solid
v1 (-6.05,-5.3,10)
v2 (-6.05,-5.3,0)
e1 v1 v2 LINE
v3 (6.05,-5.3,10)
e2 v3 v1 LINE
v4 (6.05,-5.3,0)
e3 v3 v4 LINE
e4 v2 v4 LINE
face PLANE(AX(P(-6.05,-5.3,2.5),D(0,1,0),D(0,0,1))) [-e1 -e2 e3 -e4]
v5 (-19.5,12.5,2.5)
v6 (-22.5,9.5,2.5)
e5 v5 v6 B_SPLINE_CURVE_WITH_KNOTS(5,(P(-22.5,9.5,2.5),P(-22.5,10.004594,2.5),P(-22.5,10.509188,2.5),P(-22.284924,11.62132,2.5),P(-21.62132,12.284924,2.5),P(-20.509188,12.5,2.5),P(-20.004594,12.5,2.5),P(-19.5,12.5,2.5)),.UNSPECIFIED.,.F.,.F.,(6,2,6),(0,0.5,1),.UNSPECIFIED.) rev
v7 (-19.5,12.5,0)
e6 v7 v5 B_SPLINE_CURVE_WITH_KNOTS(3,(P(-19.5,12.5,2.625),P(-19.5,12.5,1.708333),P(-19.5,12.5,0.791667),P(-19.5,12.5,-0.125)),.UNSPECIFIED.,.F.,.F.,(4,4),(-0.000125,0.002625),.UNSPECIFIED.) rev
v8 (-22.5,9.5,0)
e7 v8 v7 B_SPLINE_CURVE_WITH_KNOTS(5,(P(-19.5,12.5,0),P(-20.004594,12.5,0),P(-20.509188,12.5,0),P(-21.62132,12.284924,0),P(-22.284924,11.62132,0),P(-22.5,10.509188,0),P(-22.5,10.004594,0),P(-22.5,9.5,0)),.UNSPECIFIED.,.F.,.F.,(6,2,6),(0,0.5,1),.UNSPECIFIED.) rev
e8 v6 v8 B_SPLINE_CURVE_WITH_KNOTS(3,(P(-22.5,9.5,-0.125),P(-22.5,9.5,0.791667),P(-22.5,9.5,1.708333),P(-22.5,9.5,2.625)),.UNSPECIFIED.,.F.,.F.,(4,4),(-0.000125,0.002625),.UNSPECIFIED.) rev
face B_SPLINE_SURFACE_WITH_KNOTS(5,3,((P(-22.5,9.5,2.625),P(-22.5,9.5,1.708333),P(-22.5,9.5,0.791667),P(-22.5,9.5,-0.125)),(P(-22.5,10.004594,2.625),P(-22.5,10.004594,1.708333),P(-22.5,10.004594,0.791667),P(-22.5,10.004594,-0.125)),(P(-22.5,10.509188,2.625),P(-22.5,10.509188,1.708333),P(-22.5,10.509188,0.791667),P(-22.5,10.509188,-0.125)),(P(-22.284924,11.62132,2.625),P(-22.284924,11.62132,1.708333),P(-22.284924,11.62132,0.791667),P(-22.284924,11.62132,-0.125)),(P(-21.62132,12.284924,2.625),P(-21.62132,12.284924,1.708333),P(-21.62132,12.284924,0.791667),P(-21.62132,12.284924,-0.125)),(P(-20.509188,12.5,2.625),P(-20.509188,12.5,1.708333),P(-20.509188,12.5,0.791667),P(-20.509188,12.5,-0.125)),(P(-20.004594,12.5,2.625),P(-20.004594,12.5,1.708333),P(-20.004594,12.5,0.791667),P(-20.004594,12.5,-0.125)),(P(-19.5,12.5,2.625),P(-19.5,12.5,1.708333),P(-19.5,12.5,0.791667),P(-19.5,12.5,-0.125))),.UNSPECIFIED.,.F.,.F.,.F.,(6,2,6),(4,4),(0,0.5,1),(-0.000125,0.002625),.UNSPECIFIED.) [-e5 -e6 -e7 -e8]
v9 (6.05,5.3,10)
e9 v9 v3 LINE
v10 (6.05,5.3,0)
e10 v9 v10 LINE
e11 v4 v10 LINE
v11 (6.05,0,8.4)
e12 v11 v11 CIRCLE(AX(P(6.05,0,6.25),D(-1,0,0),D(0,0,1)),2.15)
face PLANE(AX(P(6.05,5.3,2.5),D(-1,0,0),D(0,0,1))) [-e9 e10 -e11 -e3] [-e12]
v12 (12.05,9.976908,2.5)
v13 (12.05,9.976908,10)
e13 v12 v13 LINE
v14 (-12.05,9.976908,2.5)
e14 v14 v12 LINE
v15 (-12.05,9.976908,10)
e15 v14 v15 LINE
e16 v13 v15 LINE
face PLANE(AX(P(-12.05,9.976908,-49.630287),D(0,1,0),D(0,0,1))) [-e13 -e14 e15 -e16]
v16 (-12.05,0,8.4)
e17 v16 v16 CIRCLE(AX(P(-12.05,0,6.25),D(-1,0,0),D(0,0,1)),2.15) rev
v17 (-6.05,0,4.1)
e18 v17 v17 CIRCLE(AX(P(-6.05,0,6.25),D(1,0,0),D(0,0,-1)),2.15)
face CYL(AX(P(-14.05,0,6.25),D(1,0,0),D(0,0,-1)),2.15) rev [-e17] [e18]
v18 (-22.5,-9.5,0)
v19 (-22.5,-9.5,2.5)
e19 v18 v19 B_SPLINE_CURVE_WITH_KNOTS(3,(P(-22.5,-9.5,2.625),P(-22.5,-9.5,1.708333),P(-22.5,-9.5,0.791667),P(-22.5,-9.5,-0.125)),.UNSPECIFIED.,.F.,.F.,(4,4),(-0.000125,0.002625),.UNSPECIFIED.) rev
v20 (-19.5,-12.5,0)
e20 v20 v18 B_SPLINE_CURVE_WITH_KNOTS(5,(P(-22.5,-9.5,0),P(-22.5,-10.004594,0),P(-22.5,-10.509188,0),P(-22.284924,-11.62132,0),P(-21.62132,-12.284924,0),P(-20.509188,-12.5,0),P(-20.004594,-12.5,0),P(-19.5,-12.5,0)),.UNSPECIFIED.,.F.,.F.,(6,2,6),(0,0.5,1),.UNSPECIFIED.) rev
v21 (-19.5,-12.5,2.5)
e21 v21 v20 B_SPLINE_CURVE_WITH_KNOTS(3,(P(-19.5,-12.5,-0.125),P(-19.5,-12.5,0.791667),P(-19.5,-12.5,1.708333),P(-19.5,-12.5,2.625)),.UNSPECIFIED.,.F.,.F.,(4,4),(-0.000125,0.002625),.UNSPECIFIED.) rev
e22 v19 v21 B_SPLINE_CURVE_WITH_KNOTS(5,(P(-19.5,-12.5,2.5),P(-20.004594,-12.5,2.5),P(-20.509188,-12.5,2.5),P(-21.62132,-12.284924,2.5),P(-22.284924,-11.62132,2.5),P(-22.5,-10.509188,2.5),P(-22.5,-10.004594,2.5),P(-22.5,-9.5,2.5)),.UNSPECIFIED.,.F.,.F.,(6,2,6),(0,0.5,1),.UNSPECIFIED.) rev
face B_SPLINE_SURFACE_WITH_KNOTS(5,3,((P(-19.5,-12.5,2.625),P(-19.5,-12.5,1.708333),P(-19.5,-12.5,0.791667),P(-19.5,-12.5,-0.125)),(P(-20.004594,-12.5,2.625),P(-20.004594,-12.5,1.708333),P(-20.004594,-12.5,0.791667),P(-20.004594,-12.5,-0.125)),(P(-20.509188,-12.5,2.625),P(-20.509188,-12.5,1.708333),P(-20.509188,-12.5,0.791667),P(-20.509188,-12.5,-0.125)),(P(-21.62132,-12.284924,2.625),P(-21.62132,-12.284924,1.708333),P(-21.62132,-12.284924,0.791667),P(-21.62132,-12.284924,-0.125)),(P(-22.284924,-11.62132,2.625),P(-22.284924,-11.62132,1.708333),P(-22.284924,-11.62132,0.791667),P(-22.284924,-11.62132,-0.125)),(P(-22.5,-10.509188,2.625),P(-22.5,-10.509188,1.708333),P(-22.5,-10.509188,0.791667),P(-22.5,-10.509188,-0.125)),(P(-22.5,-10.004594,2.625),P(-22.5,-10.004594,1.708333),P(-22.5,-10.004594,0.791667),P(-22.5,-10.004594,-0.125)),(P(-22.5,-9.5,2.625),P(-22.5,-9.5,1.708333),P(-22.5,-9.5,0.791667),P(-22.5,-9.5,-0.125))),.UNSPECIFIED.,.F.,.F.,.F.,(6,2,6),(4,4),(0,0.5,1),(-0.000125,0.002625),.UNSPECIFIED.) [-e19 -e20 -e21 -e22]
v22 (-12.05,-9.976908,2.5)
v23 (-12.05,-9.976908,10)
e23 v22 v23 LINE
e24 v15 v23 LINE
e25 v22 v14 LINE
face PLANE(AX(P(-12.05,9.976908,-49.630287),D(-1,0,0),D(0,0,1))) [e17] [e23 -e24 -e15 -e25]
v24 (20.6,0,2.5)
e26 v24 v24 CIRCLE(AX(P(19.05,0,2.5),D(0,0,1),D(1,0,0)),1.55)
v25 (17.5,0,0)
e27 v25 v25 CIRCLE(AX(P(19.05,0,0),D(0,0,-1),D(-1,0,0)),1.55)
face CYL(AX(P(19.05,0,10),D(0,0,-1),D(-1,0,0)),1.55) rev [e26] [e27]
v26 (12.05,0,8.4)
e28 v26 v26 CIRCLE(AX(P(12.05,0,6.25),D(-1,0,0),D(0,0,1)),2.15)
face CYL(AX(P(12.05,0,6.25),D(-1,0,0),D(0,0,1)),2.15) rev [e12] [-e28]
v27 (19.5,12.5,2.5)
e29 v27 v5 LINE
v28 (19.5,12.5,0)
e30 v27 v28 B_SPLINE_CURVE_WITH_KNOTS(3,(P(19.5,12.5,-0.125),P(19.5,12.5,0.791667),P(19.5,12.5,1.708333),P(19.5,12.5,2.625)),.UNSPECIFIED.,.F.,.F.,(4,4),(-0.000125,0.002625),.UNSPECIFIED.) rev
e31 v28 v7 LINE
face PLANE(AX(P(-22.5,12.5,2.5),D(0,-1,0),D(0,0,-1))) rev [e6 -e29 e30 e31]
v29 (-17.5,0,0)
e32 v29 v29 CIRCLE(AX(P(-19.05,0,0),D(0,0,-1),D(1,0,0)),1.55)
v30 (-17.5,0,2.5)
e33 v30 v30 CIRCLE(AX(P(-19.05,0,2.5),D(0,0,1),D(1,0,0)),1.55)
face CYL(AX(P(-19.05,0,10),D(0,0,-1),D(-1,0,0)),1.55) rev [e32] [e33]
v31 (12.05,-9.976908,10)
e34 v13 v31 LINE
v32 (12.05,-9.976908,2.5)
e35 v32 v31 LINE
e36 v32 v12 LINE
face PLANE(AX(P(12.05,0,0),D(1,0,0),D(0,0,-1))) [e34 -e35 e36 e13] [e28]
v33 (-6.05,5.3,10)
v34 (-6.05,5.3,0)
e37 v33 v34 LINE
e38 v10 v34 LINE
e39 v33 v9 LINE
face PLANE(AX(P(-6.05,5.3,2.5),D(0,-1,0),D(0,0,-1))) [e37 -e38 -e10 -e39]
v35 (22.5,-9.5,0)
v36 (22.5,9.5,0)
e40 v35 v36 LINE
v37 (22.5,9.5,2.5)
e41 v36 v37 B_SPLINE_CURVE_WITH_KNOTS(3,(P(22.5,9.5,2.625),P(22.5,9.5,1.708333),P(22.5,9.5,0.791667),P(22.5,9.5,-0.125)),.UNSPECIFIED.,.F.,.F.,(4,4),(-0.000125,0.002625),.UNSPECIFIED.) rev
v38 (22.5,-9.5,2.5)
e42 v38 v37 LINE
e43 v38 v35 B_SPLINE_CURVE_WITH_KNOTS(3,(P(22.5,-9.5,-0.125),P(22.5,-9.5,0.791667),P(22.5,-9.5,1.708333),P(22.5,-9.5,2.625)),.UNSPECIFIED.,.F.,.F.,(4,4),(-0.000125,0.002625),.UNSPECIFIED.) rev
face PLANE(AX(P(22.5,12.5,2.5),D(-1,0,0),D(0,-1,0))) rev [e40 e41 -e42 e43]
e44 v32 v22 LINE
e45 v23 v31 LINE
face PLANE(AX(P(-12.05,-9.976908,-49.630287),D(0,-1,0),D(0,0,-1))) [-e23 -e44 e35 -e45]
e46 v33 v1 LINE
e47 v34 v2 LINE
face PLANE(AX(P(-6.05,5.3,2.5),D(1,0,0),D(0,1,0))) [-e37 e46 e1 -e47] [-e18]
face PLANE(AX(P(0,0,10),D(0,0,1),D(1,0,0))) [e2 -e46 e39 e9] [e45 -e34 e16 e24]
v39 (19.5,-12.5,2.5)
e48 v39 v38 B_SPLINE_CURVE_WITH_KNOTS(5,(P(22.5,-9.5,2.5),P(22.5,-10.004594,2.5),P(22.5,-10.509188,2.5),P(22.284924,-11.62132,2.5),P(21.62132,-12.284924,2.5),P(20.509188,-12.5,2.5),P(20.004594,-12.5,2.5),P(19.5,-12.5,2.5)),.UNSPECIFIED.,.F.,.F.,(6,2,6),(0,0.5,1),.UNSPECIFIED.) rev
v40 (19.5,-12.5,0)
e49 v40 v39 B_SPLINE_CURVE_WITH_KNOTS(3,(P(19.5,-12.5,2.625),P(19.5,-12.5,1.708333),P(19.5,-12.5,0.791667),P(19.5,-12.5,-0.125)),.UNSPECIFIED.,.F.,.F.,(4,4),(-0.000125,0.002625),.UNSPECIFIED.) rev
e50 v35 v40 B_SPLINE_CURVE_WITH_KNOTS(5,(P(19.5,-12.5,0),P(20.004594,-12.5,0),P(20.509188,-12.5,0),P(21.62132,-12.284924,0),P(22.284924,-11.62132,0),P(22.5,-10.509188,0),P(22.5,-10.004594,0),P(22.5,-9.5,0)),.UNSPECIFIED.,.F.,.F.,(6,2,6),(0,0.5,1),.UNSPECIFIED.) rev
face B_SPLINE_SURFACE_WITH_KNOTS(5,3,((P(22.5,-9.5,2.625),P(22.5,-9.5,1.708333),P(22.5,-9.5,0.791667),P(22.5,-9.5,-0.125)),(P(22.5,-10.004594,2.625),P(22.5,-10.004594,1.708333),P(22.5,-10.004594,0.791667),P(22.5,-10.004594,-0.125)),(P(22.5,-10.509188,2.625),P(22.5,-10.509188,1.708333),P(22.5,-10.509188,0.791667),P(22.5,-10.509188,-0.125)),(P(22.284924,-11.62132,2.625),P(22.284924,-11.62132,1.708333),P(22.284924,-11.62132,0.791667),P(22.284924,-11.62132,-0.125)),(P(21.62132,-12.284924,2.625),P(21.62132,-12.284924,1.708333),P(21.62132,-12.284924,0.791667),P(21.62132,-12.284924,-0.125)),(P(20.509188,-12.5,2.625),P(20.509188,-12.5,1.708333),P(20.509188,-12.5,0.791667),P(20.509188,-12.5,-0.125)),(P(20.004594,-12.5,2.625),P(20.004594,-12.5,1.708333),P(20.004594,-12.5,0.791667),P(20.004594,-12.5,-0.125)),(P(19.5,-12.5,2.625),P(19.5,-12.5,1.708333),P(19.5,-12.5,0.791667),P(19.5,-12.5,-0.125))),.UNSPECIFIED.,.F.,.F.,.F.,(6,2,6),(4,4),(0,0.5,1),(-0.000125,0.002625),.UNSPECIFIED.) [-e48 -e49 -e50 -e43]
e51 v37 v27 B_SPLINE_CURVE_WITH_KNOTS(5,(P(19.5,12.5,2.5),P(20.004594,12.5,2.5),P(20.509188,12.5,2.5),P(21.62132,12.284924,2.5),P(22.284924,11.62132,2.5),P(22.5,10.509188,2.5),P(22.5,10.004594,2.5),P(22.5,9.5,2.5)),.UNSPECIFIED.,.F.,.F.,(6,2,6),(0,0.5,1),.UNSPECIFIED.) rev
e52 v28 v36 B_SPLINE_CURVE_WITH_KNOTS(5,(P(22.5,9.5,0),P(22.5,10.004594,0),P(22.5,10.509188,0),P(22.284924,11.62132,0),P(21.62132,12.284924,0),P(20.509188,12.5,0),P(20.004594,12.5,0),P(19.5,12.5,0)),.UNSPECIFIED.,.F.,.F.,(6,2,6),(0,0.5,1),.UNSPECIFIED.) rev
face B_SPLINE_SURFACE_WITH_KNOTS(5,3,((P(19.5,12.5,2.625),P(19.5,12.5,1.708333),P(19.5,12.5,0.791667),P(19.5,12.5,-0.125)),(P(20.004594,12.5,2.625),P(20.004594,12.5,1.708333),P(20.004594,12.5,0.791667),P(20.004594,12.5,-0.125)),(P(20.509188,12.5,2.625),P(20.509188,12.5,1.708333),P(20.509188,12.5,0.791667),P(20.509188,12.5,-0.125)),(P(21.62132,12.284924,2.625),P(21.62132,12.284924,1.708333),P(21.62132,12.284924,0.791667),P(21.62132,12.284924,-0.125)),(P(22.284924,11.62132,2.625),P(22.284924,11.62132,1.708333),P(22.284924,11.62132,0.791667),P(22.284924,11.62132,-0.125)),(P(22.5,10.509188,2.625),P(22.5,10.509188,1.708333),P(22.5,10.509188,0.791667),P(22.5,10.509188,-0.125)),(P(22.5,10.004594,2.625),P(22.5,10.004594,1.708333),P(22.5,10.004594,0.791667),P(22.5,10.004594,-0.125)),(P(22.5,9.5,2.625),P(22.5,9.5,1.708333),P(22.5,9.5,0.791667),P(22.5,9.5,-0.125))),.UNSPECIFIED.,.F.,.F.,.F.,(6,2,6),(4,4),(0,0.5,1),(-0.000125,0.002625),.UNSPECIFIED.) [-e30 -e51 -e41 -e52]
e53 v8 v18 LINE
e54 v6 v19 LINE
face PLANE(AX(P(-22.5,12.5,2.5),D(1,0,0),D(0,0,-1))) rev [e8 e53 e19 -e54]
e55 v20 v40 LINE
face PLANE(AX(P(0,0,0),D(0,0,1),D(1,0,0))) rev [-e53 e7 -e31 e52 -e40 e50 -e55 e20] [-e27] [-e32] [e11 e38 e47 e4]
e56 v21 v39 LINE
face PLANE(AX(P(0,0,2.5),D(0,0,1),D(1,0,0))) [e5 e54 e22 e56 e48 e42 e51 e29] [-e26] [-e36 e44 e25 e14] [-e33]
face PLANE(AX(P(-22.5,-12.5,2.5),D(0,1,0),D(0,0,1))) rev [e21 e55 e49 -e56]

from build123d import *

# Parameters (mm, degrees)
SKETCH1_W           = 45
SKETCH1_H           = 25
SKETCH1_W_2         = 12.1
SKETCH1_H_2         = 10.6
BOSS_EXTRUDE1_DEPTH = 2.5
SKETCH2_W           = 12.1
SKETCH2_H           = 7.2
BOSS_EXTRUDE2_DEPTH = 7.5
BOSS_EXTRUDE3_START = 6.05
SKETCH3_W           = 7.5
SKETCH3_H           = 25
SKETCH3_R           = 2.15
BOSS_EXTRUDE3_DEPTH = 6
BOSS_EXTRUDE4_START = -14.05
SKETCH3_2_W         = 7.5
SKETCH3_2_H         = 25
SKETCH3_2_R         = 2.15
BOSS_EXTRUDE4_DEPTH = 8
SKETCH5_R           = 1.55
CUT_EXTRUDE1_DEPTH  = 10
FILLET1_SIZE        = 3
SKETCH6_OUTSIDE_W   = 57.488
SKETCH6_OUTSIDE_H   = 37.488
SKETCH6_OUTSIDE_W_2 = 24.1
SKETCH6_OUTSIDE_H_2 = 19.953815678
CUT_EXTRUDE2_DEPTH  = 7.5


with BuildPart() as part:
    # Sketch1 → Boss-Extrude1 (new body)
    with BuildSketch(Plane.XY):
        Rectangle(SKETCH1_W, SKETCH1_H)
        Rectangle(SKETCH1_W_2, SKETCH1_H_2, mode=Mode.SUBTRACT)
    extrude(amount=BOSS_EXTRUDE1_DEPTH)

    # Sketch2 → Boss-Extrude2 (add)
    with BuildSketch(Plane.XY.offset(2.5)):
        with Locations((0, -8.9)):
            Rectangle(SKETCH2_W, SKETCH2_H)
        with Locations((0, 8.9)):
            Rectangle(SKETCH2_W, SKETCH2_H)
    extrude(amount=BOSS_EXTRUDE2_DEPTH)

    # Sketch3 → Boss-Extrude3 (add)
    with BuildSketch(Plane(origin=(0, 0, 0), x_dir=(0, 0, -1), z_dir=(1, 0, 0)).offset(BOSS_EXTRUDE3_START)):
        with Locations((-6.25, 0)):
            Rectangle(SKETCH3_W, SKETCH3_H)
        with Locations(Location((-6.25, 0, 0), (0, 0, 180))):
            Circle(SKETCH3_R, mode=Mode.SUBTRACT)
    extrude(amount=BOSS_EXTRUDE3_DEPTH)

    # Sketch3<2> → Boss-Extrude4 (add)
    with BuildSketch(Plane(origin=(0, 0, 0), x_dir=(0, 0, -1), z_dir=(1, 0, 0)).offset(BOSS_EXTRUDE4_START)):
        with Locations((-6.25, 0)):
            Rectangle(SKETCH3_2_W, SKETCH3_2_H)
        with Locations(Location((-6.25, 0, 0), (0, 0, 180))):
            Circle(SKETCH3_2_R, mode=Mode.SUBTRACT)
    extrude(amount=BOSS_EXTRUDE4_DEPTH)

    # Sketch5 → Cut-Extrude1 (cut)
    with BuildSketch(Plane(origin=(0, 0, 0), x_dir=(-1, 0, 0), z_dir=(0, 0, -1))):
        with Locations((-19.05, 0)):
            Circle(SKETCH5_R)
        with Locations(Location((19.05, 0, 0), (0, 0, 180))):
            Circle(SKETCH5_R)
    extrude(amount=-CUT_EXTRUDE1_DEPTH, mode=Mode.SUBTRACT)

    # Fillet1
    # a fillet whose section is not a circle: 3 mm, written as the material it takes off along each edge
    with BuildSketch(Plane(origin=(-22.5, -12.5, -7.5), x_dir=(0, 1, 0), z_dir=(0, 0, 1)), Plane(origin=(-22.5, 12.5, -7.5), x_dir=(1, 0, 0), z_dir=(0, 0, 1))) as fillet1_piece_1:
        with BuildLine():
            add(Edge.make_bspline([(FILLET1_SIZE, 0), (FILLET1_SIZE * 0.831801948466, 0), (FILLET1_SIZE * 0.663603896932, 0), (FILLET1_SIZE * 0.292893218813, -FILLET1_SIZE * 0.0716919198361), (FILLET1_SIZE * 0.0716919198361, -FILLET1_SIZE * 0.292893218813), (0, -FILLET1_SIZE * 0.663603896932), (0, -FILLET1_SIZE * 0.831801948466), (0, -FILLET1_SIZE)], knots=[0, 0, 0, 0, 0, 0, 0.5, 0.5, 1, 1, 1, 1, 1, 1], degree=5))
            Line((0, -FILLET1_SIZE), (0, 0))
            Line((0, 0), (FILLET1_SIZE, 0))
        make_face()
    extrude(amount=17.5, mode=Mode.SUBTRACT)
    with BuildSketch(Plane(origin=(22.5, -12.5, -7.5), x_dir=(0, 1, 0), z_dir=(0, 0, 1)), Plane(origin=(22.5, 12.5, -7.5), x_dir=(-1, 0, 0), z_dir=(0, 0, 1))) as fillet1_piece_2:
        with BuildLine():
            add(Edge.make_bspline([(FILLET1_SIZE, 0), (FILLET1_SIZE * 0.831801948466, 0), (FILLET1_SIZE * 0.663603896932, 0), (FILLET1_SIZE * 0.292893218813, FILLET1_SIZE * 0.0716919198361), (FILLET1_SIZE * 0.0716919198361, FILLET1_SIZE * 0.292893218813), (0, FILLET1_SIZE * 0.663603896932), (0, FILLET1_SIZE * 0.831801948466), (0, FILLET1_SIZE)], knots=[0, 0, 0, 0, 0, 0, 0.5, 0.5, 1, 1, 1, 1, 1, 1], degree=5))
            Line((0, FILLET1_SIZE), (0, 0))
            Line((0, 0), (FILLET1_SIZE, 0))
        make_face()
    extrude(amount=17.5, mode=Mode.SUBTRACT)

    # Sketch6 outside → Cut-Extrude2 (cut)
    with BuildSketch(Plane.XY.offset(10)):
        Rectangle(SKETCH6_OUTSIDE_W, SKETCH6_OUTSIDE_H)
        Rectangle(SKETCH6_OUTSIDE_W_2, SKETCH6_OUTSIDE_H_2, mode=Mode.SUBTRACT)
    extrude(amount=-CUT_EXTRUDE2_DEPTH, mode=Mode.SUBTRACT)


solid = part.part
